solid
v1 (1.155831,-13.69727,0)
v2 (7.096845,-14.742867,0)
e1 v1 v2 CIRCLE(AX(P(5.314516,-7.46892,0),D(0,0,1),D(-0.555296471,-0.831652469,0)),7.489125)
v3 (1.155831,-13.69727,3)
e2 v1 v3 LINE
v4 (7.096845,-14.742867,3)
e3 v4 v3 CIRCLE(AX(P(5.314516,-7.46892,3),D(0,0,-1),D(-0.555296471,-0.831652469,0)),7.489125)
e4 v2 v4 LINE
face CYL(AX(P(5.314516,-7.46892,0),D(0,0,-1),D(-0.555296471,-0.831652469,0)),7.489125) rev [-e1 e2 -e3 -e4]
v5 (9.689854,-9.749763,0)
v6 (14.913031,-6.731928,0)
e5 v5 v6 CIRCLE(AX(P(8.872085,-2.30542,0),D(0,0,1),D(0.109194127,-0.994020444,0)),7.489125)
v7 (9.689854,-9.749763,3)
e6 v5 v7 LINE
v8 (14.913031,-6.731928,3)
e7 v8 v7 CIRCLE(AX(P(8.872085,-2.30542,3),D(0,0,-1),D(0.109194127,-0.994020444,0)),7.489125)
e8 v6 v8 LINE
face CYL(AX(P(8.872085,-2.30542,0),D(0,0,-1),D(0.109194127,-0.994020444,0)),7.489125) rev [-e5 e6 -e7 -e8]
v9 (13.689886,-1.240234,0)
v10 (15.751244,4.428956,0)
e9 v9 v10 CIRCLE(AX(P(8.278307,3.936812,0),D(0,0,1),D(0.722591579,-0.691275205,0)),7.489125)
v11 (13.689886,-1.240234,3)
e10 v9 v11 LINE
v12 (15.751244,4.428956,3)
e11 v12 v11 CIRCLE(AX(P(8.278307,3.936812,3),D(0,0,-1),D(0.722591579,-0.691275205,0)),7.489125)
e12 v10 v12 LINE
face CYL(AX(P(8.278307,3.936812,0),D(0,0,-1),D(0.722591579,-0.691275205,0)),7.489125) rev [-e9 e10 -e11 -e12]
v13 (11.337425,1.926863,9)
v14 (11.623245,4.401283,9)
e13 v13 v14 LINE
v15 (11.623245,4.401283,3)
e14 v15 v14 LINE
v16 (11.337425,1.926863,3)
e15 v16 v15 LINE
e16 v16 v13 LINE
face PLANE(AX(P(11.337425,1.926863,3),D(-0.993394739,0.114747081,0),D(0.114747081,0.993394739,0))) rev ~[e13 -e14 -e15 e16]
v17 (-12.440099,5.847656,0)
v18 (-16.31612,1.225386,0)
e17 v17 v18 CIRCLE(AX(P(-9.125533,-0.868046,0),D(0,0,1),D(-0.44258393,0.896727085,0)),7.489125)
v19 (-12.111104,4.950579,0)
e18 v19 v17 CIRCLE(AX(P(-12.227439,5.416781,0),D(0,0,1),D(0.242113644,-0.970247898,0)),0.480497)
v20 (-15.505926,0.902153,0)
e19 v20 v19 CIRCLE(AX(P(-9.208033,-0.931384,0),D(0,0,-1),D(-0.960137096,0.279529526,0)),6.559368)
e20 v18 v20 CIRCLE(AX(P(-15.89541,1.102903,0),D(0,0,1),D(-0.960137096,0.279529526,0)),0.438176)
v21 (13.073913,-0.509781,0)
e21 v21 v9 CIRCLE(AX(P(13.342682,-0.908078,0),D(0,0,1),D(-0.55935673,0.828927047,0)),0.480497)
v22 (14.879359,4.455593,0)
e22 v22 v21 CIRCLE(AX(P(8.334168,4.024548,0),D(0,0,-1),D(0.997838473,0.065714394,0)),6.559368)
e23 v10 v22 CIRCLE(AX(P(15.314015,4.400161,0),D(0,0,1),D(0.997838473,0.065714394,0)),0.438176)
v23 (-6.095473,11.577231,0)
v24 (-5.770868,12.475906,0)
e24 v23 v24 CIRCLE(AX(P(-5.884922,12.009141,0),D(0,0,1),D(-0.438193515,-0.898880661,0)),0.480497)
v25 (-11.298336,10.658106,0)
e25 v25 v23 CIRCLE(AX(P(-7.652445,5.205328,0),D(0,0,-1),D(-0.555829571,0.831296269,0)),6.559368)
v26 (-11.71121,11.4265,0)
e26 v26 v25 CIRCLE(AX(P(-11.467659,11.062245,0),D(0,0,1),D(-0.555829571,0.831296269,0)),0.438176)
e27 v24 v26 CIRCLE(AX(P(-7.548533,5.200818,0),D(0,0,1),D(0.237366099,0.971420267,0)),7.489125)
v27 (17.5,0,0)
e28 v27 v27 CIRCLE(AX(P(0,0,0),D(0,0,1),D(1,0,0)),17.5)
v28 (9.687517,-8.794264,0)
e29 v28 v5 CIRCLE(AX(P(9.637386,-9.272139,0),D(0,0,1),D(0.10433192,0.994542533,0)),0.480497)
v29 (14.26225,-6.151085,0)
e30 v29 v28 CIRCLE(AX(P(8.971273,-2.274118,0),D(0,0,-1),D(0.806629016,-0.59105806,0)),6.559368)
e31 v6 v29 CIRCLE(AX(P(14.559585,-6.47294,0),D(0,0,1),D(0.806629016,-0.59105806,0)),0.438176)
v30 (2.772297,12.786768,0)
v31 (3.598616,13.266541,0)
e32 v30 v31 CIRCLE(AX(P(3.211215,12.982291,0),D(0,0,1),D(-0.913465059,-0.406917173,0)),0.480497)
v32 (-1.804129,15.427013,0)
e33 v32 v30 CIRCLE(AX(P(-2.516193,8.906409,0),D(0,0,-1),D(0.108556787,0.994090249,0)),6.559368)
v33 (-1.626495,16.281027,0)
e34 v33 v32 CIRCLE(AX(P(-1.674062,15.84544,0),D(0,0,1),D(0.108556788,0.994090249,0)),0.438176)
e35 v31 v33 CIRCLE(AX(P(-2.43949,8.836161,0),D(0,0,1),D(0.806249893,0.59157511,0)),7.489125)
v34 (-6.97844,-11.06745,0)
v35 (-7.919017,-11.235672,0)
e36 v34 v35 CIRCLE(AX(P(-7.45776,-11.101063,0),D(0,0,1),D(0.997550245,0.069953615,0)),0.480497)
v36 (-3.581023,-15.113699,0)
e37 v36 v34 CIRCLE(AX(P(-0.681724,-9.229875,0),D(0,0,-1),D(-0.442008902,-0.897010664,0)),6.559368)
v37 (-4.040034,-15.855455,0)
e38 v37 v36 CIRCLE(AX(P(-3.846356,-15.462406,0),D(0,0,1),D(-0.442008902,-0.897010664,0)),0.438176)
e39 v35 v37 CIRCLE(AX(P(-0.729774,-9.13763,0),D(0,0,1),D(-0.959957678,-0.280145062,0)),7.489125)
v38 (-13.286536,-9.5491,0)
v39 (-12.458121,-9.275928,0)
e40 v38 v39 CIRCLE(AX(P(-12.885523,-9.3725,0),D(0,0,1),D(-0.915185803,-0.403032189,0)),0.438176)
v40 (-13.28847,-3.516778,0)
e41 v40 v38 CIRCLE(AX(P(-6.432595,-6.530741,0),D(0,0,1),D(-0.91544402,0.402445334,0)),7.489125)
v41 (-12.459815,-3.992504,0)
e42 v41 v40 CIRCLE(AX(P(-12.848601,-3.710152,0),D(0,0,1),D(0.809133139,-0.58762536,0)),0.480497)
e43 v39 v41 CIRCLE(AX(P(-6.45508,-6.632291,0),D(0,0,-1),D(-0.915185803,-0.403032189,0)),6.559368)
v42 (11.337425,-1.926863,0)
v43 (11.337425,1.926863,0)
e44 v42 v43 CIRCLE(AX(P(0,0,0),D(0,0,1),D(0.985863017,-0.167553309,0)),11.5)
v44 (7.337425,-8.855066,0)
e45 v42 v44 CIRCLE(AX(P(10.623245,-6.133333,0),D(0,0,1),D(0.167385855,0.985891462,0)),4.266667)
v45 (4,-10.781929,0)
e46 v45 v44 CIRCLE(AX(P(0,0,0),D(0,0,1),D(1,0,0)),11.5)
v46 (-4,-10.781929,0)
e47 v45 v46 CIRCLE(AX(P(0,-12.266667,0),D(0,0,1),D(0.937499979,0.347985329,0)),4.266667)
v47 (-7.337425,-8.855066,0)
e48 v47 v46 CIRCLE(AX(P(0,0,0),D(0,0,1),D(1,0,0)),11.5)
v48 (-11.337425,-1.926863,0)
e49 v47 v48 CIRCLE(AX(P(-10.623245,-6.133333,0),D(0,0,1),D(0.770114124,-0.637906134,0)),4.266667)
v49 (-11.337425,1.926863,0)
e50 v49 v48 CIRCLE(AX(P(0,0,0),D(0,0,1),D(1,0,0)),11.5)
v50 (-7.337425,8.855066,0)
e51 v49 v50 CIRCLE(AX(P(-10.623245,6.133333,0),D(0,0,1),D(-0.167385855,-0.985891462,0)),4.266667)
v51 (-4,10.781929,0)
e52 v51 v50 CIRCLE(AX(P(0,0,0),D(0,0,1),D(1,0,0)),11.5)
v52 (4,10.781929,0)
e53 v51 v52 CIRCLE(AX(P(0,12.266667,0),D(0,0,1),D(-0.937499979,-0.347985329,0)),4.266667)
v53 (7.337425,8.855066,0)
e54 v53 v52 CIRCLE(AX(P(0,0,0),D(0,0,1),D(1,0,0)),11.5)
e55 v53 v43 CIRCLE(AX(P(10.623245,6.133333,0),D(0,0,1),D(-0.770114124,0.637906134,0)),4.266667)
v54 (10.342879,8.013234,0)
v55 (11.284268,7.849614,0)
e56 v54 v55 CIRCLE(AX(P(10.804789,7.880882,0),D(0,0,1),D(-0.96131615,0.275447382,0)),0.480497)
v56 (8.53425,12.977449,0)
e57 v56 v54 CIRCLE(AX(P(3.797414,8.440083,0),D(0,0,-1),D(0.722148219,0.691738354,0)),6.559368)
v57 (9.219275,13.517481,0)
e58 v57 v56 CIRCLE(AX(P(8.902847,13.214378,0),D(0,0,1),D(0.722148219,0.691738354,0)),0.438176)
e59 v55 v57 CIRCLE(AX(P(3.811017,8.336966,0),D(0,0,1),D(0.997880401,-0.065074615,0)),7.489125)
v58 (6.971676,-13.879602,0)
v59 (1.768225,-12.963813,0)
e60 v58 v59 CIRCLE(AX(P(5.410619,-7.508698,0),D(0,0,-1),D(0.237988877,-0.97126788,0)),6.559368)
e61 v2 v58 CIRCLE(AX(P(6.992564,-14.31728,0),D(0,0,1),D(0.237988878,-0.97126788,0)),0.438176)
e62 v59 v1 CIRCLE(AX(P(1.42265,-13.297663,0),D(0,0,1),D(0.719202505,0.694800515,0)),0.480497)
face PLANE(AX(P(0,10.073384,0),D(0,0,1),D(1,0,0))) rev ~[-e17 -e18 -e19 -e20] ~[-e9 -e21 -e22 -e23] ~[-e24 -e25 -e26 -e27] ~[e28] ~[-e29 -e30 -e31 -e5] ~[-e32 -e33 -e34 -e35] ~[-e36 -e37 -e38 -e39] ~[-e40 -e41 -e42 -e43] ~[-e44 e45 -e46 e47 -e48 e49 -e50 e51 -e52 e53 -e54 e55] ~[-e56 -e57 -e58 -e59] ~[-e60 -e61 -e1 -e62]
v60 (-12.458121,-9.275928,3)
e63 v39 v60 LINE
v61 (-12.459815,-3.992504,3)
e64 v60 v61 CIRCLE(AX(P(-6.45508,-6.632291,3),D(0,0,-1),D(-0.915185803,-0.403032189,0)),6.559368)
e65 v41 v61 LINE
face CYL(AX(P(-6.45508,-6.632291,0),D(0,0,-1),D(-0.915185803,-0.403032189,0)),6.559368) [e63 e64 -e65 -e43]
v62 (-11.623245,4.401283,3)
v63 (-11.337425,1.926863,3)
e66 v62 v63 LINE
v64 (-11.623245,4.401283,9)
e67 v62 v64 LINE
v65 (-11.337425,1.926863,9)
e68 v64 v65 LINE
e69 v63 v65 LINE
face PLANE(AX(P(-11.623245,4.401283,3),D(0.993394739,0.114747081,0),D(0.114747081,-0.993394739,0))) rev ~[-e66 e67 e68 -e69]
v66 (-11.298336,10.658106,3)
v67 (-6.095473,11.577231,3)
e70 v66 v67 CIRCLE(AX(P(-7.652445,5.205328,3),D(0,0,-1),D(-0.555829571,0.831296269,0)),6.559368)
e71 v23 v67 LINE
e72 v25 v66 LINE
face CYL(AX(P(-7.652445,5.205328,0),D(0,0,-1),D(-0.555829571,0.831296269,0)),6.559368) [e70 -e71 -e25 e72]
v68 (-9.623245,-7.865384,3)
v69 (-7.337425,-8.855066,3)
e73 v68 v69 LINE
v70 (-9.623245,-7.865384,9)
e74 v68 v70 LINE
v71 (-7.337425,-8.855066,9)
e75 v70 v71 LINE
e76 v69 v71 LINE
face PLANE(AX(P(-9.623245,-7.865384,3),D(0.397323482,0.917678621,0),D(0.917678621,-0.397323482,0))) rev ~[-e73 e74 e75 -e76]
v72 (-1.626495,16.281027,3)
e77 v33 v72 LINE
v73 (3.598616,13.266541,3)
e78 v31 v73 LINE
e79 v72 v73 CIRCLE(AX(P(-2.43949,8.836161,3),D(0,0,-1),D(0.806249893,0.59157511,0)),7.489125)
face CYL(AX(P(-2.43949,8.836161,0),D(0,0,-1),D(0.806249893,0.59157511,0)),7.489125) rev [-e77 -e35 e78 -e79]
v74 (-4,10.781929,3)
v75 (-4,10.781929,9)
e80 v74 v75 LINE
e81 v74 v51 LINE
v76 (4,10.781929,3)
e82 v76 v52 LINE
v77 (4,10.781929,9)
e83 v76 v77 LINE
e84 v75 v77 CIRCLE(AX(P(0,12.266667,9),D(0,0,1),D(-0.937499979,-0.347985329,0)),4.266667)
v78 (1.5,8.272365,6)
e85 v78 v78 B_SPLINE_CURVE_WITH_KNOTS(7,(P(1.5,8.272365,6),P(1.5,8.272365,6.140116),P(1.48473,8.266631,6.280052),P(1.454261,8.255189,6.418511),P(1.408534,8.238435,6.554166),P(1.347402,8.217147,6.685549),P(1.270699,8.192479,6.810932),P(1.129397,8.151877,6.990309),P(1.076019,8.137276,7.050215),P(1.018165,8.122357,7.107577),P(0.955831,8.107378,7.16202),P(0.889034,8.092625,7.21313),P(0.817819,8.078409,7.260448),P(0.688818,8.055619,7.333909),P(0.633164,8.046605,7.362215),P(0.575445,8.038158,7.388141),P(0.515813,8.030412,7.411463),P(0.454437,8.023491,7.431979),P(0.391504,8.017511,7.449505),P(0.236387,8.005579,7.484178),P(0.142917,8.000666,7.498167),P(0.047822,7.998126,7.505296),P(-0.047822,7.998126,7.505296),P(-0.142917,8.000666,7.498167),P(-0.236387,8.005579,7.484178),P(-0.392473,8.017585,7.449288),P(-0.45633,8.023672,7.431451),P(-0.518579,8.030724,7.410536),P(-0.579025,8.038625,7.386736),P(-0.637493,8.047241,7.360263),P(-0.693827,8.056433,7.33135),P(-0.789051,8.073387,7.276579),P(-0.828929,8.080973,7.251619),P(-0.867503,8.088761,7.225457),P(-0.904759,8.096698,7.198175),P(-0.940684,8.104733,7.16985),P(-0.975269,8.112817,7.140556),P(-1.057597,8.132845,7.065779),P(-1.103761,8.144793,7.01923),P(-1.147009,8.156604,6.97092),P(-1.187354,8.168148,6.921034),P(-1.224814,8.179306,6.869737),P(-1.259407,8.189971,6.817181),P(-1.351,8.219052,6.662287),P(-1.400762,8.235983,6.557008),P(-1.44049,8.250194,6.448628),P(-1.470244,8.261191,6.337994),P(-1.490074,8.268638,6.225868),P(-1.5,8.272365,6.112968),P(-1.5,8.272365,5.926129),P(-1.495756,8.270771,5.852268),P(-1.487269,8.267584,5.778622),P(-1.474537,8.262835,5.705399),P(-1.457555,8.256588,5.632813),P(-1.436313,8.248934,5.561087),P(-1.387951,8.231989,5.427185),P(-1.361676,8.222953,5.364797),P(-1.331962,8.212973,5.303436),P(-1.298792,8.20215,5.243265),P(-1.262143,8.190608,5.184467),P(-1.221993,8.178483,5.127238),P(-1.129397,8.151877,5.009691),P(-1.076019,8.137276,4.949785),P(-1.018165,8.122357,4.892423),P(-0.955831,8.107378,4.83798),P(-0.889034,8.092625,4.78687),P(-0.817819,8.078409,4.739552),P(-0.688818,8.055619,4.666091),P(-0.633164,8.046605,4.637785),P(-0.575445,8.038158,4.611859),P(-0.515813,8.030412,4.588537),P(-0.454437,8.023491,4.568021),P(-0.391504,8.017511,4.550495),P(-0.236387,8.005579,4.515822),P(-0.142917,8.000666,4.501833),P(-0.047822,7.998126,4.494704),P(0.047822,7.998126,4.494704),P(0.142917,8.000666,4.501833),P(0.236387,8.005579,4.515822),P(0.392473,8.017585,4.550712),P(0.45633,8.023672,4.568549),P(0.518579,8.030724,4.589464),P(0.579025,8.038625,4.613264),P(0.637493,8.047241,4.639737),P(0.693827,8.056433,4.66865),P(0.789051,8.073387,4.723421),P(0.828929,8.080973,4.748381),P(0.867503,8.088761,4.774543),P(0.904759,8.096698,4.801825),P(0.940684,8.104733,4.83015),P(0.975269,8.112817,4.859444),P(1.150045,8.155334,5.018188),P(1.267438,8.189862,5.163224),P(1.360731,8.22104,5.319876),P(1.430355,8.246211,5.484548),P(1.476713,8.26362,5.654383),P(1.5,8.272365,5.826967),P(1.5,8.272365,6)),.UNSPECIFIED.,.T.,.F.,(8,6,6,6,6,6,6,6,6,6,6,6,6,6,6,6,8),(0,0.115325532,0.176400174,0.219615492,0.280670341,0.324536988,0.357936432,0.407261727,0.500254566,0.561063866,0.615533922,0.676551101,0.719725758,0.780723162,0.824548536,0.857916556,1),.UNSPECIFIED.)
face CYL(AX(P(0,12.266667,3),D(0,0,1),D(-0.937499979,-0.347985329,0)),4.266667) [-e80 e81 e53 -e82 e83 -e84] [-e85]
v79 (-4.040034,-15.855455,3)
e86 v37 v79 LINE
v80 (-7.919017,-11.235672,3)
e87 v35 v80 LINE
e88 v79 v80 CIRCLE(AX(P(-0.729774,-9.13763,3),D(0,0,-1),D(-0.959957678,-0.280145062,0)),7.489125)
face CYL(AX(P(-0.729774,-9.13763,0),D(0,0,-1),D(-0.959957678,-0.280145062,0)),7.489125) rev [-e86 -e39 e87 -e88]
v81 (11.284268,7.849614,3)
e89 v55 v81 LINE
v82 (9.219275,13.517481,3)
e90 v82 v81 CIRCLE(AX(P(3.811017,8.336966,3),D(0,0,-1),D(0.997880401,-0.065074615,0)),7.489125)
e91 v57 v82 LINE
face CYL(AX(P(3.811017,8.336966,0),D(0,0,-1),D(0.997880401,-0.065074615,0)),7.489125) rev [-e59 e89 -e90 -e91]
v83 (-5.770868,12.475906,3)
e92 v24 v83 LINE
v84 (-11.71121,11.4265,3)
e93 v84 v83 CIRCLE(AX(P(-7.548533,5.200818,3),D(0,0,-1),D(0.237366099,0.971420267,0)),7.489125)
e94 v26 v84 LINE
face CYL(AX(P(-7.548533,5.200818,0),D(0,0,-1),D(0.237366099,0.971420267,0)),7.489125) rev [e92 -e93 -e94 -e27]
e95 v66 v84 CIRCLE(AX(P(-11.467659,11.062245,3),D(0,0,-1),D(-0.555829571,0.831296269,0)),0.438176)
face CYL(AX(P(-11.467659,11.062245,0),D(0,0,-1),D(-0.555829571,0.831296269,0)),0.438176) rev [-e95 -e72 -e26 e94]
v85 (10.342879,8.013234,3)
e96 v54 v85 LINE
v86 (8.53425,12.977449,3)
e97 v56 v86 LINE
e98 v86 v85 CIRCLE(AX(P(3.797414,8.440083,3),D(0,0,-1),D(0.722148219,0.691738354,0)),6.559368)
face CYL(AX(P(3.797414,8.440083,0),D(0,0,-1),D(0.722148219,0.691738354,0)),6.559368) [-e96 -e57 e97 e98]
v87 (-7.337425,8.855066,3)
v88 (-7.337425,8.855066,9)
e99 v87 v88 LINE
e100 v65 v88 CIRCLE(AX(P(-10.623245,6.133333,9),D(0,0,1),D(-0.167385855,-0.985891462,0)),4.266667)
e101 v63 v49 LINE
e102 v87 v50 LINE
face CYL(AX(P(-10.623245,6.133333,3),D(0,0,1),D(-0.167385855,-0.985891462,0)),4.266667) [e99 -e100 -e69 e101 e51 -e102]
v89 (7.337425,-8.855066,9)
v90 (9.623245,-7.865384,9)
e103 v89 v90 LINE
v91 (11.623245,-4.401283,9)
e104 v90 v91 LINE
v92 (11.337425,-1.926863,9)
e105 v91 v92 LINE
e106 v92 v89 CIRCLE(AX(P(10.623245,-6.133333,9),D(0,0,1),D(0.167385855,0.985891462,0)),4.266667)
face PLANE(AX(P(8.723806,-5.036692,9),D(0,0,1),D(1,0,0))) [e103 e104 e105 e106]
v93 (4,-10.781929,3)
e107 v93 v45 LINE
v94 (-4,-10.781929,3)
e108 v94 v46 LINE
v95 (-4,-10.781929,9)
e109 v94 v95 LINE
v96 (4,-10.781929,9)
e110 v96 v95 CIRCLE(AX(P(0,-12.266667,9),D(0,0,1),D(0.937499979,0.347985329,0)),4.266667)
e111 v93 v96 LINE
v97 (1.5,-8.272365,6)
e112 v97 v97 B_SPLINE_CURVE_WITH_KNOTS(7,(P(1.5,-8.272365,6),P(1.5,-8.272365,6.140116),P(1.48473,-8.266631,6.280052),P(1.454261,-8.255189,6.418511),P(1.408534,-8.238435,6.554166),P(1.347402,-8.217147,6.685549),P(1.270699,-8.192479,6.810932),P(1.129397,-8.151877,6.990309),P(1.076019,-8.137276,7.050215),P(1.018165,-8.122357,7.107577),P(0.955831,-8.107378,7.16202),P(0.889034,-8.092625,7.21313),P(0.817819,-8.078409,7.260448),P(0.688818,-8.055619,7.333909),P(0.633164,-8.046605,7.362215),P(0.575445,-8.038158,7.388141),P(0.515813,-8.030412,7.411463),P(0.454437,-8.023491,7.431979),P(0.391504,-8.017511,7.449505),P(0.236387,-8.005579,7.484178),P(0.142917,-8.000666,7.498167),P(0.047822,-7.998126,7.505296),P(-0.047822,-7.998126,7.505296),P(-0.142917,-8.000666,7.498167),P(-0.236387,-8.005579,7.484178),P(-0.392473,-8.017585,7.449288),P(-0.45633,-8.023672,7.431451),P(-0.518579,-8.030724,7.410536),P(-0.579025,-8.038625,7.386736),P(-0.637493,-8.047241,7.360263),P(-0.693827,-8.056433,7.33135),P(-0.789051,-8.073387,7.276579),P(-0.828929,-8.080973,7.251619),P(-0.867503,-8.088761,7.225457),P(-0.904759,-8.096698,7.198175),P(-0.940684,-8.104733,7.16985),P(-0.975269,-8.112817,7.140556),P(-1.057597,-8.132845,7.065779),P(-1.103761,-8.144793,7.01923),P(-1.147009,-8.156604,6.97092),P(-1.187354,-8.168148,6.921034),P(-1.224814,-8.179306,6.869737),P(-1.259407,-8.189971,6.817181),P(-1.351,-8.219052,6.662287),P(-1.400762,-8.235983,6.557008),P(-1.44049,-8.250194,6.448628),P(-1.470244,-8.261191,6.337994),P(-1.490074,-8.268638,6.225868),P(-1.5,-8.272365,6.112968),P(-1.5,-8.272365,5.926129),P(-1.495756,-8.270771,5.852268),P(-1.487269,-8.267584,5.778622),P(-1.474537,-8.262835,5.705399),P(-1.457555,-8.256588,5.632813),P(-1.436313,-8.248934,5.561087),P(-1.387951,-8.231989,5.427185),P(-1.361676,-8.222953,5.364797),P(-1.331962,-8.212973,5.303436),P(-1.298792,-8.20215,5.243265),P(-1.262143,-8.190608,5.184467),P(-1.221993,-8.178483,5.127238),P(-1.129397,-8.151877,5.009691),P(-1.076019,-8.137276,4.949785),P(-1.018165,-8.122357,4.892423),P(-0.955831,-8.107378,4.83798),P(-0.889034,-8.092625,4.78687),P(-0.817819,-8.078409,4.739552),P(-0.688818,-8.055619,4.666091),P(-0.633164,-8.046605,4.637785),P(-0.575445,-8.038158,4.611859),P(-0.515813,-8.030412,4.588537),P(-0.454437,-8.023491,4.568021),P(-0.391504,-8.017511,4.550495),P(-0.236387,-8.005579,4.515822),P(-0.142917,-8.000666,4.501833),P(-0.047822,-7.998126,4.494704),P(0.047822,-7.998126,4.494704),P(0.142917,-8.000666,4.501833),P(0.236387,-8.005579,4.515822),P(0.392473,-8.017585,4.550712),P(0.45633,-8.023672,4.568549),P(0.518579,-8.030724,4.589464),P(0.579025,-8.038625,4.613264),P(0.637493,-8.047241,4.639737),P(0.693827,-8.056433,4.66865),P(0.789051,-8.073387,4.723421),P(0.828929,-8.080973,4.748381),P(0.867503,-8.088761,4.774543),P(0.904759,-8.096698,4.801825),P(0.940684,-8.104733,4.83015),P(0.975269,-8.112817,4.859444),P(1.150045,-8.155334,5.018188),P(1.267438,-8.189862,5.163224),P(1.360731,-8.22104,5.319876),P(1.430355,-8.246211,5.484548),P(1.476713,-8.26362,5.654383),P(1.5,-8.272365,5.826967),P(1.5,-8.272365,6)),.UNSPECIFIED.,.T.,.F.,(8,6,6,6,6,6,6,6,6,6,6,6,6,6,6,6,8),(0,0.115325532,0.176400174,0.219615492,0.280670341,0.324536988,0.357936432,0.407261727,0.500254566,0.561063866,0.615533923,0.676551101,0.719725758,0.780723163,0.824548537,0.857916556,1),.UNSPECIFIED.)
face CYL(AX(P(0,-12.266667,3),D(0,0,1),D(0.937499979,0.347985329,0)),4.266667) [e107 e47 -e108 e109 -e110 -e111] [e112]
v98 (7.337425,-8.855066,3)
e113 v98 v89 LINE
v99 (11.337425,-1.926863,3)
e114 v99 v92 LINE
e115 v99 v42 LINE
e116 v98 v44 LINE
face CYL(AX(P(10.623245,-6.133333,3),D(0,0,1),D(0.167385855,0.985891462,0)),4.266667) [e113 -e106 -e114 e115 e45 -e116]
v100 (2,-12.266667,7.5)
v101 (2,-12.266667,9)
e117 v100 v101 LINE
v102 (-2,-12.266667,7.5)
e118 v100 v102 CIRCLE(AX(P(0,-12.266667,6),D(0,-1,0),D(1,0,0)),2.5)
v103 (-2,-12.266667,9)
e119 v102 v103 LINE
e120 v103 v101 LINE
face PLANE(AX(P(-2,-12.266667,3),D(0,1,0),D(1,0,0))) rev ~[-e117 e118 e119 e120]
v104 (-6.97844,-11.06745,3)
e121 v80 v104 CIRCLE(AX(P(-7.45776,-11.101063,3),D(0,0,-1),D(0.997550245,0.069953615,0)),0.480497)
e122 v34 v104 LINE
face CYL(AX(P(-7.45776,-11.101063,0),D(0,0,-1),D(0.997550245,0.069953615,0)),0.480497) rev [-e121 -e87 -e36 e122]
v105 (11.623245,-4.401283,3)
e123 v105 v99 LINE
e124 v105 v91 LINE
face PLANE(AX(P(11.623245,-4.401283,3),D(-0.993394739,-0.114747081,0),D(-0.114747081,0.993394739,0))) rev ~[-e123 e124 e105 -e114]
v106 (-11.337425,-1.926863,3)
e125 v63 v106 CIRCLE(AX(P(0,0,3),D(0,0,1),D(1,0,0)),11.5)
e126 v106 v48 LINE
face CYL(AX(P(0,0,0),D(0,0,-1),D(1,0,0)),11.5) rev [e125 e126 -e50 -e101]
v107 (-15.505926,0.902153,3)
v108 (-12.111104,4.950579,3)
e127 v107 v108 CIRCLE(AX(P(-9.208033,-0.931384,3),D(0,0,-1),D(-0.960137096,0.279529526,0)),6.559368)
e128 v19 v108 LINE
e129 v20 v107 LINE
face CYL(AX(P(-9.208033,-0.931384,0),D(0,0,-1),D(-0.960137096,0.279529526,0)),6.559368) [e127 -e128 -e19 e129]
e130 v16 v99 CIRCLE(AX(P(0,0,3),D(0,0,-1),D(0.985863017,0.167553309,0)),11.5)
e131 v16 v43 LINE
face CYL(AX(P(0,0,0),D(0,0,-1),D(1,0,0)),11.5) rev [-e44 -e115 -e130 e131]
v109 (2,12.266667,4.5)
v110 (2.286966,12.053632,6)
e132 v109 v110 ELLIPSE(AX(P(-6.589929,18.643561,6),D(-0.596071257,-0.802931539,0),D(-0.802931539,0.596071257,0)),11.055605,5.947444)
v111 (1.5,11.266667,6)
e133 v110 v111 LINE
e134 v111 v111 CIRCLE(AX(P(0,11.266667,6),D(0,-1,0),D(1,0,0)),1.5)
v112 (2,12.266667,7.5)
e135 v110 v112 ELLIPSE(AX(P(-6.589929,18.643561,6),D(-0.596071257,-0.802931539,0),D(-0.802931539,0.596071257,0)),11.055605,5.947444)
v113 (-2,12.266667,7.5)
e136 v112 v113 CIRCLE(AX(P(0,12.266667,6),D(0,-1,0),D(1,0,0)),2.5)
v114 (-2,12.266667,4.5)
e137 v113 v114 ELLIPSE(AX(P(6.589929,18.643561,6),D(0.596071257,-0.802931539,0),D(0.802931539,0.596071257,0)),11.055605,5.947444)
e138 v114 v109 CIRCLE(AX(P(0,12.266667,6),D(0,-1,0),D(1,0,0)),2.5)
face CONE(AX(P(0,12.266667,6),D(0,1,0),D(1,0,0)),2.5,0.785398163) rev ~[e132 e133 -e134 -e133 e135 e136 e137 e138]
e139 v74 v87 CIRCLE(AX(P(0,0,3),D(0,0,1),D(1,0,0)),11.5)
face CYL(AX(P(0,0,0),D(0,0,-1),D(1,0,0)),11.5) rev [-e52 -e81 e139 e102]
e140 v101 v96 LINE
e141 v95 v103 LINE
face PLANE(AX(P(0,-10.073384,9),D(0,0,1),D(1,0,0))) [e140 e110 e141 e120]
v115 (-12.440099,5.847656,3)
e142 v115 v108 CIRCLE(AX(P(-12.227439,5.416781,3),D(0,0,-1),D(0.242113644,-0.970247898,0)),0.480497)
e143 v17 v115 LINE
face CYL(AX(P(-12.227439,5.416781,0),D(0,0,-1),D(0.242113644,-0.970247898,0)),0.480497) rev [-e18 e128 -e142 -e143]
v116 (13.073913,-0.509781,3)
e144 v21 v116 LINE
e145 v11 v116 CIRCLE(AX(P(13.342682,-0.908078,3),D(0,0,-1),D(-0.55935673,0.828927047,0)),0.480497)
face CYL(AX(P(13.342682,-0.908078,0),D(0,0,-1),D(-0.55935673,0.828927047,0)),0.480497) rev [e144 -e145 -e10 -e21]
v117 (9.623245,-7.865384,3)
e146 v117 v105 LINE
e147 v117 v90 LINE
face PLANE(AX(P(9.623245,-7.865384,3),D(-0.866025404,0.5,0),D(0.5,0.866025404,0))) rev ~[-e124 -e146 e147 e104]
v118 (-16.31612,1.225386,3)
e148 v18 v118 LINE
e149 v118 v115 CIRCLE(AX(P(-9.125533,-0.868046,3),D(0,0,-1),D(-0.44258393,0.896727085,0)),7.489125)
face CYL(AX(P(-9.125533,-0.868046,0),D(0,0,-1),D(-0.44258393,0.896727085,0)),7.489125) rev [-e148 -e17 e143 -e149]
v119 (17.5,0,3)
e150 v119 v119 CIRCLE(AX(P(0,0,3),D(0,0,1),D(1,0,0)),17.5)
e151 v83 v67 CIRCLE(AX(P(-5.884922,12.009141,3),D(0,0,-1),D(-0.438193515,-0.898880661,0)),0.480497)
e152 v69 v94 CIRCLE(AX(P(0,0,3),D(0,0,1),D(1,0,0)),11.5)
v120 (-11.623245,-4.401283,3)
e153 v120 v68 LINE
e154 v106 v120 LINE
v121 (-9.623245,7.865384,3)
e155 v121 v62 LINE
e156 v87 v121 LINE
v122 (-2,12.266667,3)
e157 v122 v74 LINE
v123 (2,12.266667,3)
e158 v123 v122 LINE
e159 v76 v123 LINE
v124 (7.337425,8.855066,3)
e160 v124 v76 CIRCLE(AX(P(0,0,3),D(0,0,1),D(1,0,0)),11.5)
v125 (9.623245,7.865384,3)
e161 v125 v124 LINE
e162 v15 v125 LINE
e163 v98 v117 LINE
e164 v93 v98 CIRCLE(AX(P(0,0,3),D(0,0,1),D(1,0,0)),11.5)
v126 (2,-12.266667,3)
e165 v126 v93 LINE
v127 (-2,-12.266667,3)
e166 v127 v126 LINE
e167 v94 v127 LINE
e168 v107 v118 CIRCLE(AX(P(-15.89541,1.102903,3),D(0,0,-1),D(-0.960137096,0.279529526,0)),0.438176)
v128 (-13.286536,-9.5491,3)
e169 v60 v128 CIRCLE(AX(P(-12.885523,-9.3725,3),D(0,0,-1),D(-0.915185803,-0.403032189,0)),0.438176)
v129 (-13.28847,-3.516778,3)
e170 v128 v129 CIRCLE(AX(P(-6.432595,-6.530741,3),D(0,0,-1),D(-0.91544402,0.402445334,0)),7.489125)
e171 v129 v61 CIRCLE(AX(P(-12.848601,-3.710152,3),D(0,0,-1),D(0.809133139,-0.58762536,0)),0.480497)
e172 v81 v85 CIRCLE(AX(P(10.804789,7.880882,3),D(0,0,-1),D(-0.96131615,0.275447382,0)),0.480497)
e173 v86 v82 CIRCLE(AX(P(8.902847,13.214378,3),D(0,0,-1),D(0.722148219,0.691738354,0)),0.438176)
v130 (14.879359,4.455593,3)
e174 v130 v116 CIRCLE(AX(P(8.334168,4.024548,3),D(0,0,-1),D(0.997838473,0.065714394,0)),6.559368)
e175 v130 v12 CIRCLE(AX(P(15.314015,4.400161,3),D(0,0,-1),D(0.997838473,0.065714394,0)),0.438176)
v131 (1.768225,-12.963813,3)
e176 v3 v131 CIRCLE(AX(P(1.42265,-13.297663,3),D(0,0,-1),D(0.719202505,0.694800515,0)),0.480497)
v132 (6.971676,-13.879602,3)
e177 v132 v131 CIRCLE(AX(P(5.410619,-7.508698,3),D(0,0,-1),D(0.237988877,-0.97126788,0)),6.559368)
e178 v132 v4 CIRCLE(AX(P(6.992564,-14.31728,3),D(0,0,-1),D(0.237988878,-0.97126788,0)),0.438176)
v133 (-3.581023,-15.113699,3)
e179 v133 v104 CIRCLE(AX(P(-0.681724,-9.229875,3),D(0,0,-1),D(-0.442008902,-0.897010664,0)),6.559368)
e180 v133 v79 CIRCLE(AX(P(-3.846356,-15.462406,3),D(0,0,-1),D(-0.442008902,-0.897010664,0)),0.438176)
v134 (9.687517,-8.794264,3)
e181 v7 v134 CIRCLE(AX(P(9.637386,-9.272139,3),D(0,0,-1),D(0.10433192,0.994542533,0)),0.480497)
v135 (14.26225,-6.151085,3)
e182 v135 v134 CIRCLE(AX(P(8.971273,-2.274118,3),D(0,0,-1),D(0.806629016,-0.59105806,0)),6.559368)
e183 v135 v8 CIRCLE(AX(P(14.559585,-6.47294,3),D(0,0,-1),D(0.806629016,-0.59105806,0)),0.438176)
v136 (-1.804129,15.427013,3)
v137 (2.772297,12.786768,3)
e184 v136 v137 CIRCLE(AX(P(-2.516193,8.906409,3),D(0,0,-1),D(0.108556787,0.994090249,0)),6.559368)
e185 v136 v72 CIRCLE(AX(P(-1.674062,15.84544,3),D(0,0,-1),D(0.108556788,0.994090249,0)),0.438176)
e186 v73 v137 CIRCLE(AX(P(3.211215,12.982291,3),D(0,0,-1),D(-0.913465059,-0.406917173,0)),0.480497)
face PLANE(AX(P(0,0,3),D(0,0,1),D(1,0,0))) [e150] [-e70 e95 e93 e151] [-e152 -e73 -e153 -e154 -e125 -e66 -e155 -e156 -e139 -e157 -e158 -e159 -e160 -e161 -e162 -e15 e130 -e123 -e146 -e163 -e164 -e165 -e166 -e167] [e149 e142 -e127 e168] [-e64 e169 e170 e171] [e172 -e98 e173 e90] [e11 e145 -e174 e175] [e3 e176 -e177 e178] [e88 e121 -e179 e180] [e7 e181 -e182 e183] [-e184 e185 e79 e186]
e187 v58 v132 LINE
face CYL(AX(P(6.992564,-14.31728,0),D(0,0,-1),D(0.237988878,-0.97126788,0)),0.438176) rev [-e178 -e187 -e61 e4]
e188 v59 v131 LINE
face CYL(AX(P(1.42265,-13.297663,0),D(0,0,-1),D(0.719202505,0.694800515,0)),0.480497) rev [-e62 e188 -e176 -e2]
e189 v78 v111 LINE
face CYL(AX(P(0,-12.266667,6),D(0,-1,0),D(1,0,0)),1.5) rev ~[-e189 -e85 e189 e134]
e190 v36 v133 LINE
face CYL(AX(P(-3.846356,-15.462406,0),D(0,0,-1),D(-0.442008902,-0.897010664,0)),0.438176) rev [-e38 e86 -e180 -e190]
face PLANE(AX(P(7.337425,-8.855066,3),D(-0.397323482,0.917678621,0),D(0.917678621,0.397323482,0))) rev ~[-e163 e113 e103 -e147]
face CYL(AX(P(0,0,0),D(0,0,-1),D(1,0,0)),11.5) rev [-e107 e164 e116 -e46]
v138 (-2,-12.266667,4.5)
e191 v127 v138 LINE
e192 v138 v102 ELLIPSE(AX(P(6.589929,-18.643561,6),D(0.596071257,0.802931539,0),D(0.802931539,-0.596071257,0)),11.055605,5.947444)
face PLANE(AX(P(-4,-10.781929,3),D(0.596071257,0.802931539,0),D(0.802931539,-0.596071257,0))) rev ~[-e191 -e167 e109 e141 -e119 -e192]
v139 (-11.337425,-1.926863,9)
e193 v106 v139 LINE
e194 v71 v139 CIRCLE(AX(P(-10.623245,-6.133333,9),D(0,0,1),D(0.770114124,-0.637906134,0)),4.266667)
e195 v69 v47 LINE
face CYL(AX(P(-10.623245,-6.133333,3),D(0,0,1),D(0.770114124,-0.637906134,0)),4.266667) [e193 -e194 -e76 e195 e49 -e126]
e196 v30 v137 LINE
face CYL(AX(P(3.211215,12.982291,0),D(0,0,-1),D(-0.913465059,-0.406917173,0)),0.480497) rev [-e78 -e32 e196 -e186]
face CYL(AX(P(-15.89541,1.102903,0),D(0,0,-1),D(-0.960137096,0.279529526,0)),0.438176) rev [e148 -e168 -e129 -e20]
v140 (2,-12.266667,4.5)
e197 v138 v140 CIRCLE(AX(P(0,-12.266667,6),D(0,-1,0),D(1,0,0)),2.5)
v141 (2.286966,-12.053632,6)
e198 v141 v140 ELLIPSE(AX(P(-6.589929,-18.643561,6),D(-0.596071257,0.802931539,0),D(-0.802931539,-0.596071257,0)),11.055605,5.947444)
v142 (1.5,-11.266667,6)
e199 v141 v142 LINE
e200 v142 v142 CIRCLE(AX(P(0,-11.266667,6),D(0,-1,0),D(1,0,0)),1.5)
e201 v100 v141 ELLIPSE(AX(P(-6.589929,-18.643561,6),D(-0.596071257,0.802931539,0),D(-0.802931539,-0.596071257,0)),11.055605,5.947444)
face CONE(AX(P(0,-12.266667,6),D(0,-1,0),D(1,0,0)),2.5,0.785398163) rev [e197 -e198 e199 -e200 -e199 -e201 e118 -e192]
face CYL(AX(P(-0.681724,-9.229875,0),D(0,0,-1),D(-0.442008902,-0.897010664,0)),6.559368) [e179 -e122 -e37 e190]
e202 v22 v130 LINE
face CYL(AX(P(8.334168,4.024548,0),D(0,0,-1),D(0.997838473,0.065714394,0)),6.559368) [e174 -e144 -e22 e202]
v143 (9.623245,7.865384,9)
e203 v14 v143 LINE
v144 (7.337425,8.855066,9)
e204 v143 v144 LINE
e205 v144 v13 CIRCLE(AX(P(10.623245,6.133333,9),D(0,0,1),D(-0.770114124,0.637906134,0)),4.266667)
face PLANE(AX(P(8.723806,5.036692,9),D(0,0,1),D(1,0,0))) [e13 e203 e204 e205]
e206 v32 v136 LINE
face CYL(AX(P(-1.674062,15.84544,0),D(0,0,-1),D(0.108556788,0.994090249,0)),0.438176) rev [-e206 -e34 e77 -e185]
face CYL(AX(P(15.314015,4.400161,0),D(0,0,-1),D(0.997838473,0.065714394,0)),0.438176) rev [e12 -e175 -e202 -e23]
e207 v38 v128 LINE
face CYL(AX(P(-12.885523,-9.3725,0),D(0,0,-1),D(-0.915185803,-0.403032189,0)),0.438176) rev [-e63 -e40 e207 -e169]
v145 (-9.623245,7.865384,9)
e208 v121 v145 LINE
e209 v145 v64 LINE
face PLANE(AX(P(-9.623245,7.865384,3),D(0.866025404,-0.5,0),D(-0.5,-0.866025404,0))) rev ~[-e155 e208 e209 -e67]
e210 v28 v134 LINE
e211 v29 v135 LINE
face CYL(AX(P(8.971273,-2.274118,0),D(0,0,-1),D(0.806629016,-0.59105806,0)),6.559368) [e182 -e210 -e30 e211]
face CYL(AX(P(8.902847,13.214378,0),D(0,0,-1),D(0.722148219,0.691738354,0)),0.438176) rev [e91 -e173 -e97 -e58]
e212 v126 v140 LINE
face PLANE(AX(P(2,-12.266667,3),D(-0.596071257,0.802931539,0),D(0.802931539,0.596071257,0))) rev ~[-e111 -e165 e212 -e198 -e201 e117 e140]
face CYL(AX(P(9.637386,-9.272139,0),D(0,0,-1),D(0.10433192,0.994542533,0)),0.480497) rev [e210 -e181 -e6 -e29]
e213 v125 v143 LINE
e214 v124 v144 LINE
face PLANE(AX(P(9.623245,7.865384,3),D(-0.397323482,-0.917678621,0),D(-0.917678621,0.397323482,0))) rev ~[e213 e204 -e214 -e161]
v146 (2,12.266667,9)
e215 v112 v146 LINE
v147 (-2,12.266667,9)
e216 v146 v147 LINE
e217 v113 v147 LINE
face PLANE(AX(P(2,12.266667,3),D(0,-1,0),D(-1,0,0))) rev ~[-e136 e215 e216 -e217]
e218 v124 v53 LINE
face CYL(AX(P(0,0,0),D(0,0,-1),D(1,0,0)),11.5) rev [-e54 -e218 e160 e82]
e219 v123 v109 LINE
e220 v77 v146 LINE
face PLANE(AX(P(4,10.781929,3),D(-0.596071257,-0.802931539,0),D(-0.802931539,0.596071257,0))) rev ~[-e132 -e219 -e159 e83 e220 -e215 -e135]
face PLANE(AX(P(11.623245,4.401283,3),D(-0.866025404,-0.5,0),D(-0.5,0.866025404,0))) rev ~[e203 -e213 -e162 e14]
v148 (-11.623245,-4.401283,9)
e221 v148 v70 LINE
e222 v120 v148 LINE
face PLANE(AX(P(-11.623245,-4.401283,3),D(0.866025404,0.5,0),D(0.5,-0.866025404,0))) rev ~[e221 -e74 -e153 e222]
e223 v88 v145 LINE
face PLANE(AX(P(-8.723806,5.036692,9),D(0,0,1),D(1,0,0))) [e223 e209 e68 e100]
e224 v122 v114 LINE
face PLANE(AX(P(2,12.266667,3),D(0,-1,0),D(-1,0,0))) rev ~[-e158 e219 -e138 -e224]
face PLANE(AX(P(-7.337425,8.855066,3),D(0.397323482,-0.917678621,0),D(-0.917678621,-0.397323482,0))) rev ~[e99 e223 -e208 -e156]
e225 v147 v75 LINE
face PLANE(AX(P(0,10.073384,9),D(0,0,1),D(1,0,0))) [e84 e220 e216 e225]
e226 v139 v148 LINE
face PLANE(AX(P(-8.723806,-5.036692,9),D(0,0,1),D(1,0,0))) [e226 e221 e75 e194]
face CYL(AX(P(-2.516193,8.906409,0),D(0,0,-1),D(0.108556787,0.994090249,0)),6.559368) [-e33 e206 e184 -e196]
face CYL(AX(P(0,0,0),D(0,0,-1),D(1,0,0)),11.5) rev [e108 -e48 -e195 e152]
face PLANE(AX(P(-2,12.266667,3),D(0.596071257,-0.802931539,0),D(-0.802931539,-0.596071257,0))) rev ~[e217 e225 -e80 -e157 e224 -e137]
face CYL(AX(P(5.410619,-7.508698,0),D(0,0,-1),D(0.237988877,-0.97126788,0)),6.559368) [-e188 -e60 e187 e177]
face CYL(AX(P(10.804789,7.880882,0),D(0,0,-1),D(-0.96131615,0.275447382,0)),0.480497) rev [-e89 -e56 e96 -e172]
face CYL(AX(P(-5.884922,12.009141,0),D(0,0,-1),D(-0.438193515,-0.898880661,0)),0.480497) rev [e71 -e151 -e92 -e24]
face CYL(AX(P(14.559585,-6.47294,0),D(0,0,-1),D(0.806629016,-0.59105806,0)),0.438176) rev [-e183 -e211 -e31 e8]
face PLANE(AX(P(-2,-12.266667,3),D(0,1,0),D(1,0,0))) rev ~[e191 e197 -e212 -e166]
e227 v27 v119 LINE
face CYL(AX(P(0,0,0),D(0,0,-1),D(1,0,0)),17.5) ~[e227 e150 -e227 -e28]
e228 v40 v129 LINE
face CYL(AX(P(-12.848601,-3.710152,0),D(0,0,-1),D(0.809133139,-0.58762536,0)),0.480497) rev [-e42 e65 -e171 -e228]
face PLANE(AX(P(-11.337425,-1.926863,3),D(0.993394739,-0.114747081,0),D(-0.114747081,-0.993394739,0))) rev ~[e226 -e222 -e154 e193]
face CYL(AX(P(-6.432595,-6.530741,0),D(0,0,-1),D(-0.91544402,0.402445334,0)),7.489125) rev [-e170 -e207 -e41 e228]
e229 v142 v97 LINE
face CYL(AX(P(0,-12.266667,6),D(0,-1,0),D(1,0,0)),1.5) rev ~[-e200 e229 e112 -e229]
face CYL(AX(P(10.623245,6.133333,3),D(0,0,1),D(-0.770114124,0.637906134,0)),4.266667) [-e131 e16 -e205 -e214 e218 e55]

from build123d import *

# Parameters (mm, degrees)
F0_R          = 17.5
F0_R_2        = 11.5
F1_DEPTH      = 3
F3_DEPTH      = 3.001
F5_DEPTH      = 6
F5_DEPTH_BACK = 3
F6_R          = 1.5
F7_DEPTH      = 29.767666761


# Not quite as in the source:
# - a fillet or chamfer that OpenCascade refuses, or shapes differently, is made with other operations: its cross-section is extruded or revolved along the edge and cut away or added


with BuildPart() as f1:
    # F0 (on Top) → F1 (new body)
    with BuildSketch(Plane.XY):
        Circle(F0_R)
        Circle(F0_R_2, mode=Mode.SUBTRACT)
    extrude(amount=F1_DEPTH)

    # F2 (on Top) → F3 (cut, through all)
    with BuildSketch(Plane.XY):
        with BuildLine():
            ThreePointArc((10.3428791664, 8.0132342217), (10.722508829, 7.4074823165), (11.2842680034, 7.8496142891))
            ThreePointArc((11.2842680034, 7.8496142891), (10.8476709377, 10.9006538274), (9.2192751651, 13.5174813857))
            ThreePointArc((9.2192751651, 13.5174813857), (8.6315737781, 13.5584848298), (8.5342502168, 12.9774492654))
            ThreePointArc((8.5342502168, 12.9774492654), (9.9604845752, 10.6854945477), (10.3428791664, 8.0132342217))
        make_face()
        with BuildLine():
            ThreePointArc((2.7722974401, 12.7867681236), (3.4524804527, 12.5667564861), (3.5986159928, 13.2665410638))
            ThreePointArc((3.5986159928, 13.2665410638), (1.3029928249, 15.3231337636), (-1.6264950391, 16.2810273468))
            ThreePointArc((-1.6264950391, 16.2810273468), (-2.1030569267, 15.9346706376), (-1.8041286384, 15.427013193))
            ThreePointArc((-1.8041286384, 15.427013193), (0.761670361, 14.5880397916), (2.7722974401, 12.7867681236))
        make_face()
        with BuildLine():
            ThreePointArc((-6.0954730691, 11.5772311114), (-5.4330018975, 11.8459056319), (-5.770868435, 12.4759058335))
            ThreePointArc((-5.770868435, 12.4759058335), (-8.8513701119, 12.5757491141), (-11.711210138, 11.426499669))
            ThreePointArc((-11.711210138, 11.426499669), (-11.8536439226, 10.85484696), (-11.298335653, 10.6581061954))
            ThreePointArc((-11.298335653, 10.6581061954), (-8.7935378801, 11.6646790891), (-6.0954730691, 11.5772311114))
        make_face()
        with BuildLine():
            ThreePointArc((-12.1111039857, 4.9505789955), (-11.7763222787, 5.5822238799), (-12.440099386, 5.8476556095))
            ThreePointArc((-12.440099386, 5.8476556095), (-14.8640786012, 3.9440316902), (-16.3161198577, 1.2253858046))
            ThreePointArc((-16.3161198577, 1.2253858046), (-16.0577791885, 0.6959197515), (-15.5059258486, 0.9021528573))
            ThreePointArc((-15.5059258486, 0.9021528573), (-14.2341520178, 3.2832854023), (-12.1111039857, 4.9505789955))
        make_face()
        with BuildLine():
            ThreePointArc((-12.4598147474, -3.9925040519), (-12.6093705865, -3.293442465), (-13.288469578, -3.5167776637))
            ThreePointArc((-13.288469578, -3.5167776637), (-13.9217195173, -6.5331419945), (-13.2865357625, -9.5490996964))
            ThreePointArc((-13.2865357625, -9.5490996964), (-12.7483011098, -9.7886360429), (-12.4581210104, -9.275927829))
            ThreePointArc((-12.4581210104, -9.275927829), (-13.0144482314, -6.6343940139), (-12.4598147474, -3.9925040519))
        make_face()
        with BuildLine():
            ThreePointArc((-6.9784397134, -11.0674500817), (-7.5423542593, -10.6280704779), (-7.9190171696, -11.2356715834))
            ThreePointArc((-7.9190171696, -11.2356715834), (-6.4652331485, -13.9533859322), (-4.0400339207, -15.855455323))
            ThreePointArc((-4.0400339207, -15.855455323), (-3.4737512602, -15.6929802443), (-3.5810228949, -15.1136987937))
            ThreePointArc((-3.5810228949, -15.1136987937), (-5.705139478, -13.4477667379), (-6.9784397134, -11.0674500817))
        make_face()
        with BuildLine():
            ThreePointArc((1.7682248193, -12.9638132172), (1.0538134497, -12.9897061964), (1.1558313826, -13.6972698986))
            ThreePointArc((1.1558313826, -13.6972698986), (4.0164076635, -14.8446855176), (7.0968446926, -14.7428671903))
            ThreePointArc((7.0968446926, -14.7428671903), (7.4262054104, -14.2544045814), (6.9716756317, -13.8796021227))
            ThreePointArc((6.9716756317, -13.8796021227), (4.2736674427, -13.9687799499), (1.7682248193, -12.9638132172))
        make_face()
        with BuildLine():
            ThreePointArc((9.6875173073, -8.7942640717), (9.1568901338, -9.2733140211), (9.6898535852, -9.7497634001))
            ThreePointArc((9.6898535852, -9.7497634001), (12.6187266924, -8.7899917691), (14.9130308016, -6.7319276504))
            ThreePointArc((14.9130308016, -6.7319276504), (14.8513580365, -6.1460345947), (14.2622496488, -6.151085364))
            ThreePointArc((14.2622496488, -6.151085364), (12.2527778705, -7.9536457777), (9.6875173073, -8.7942640717))
        make_face()
        with BuildLine():
            ThreePointArc((13.0739127825, -0.5097810297), (12.9753561567, -1.2178351539), (13.6898856045, -1.2402342502))
            ThreePointArc((13.6898856045, -1.2402342502), (15.3166032603, 1.3776368181), (15.7512440587, 4.4289556541))
            ThreePointArc((15.7512440587, 4.4289556541), (15.3273951828, 4.8381332844), (14.8793585479, 4.4555925983))
            ThreePointArc((14.8793585479, 4.4555925983), (14.4986773582, 1.7830876488), (13.0739127825, -0.5097810297))
        make_face()
    extrude(amount=F3_DEPTH, mode=Mode.SUBTRACT)

    # F4 (on face) → F5 (join, two sides)
    with BuildSketch(Plane.XY.offset(3)) as f5_sk:
        with BuildLine():
            ThreePointArc((-4, 10.7819293264), (0, 8), (4, 10.7819293264))
            ThreePointArc((4, 10.7819293264), (0, 11.5), (-4, 10.7819293264))
        make_face()
        with BuildLine():
            ThreePointArc((7.3374246985, 8.8550662783), (6.9282032303, 4), (11.3374246985, 1.9268630481))
            ThreePointArc((11.3374246985, 1.9268630481), (9.9592921435, 5.75), (7.3374246985, 8.8550662783))
        make_face()
        with BuildLine():
            ThreePointArc((7.3374246985, -8.8550662783), (9.9592921435, -5.75), (11.3374246985, -1.9268630481))
            ThreePointArc((11.3374246985, -1.9268630481), (6.9282032303, -4), (7.3374246985, -8.8550662783))
        make_face()
        with BuildLine():
            ThreePointArc((-4, -10.7819293264), (0, -11.5), (4, -10.7819293264))
            ThreePointArc((4, -10.7819293264), (0, -8), (-4, -10.7819293264))
        make_face()
        with BuildLine():
            ThreePointArc((-11.3374246985, -1.9268630481), (-9.9592921435, -5.75), (-7.3374246985, -8.8550662783))
            ThreePointArc((-7.3374246985, -8.8550662783), (-6.9282032303, -4), (-11.3374246985, -1.9268630481))
        make_face()
        with BuildLine():
            ThreePointArc((-11.3374246985, 1.9268630481), (-6.9282032303, 4), (-7.3374246985, 8.8550662783))
            ThreePointArc((-7.3374246985, 8.8550662783), (-9.9592921435, 5.75), (-11.3374246985, 1.9268630481))
        make_face()
        with BuildLine():
            ThreePointArc((-4, 10.7819293264), (0, 11.5), (4, 10.7819293264))
            Line((4, 10.7819293264), (2, 12.266666761))
            Line((2, 12.266666761), (0, 12.266666761))
            Line((0, 12.266666761), (-2, 12.266666761))
            Line((-2, 12.266666761), (-4, 10.7819293264))
        make_face()
        with BuildLine():
            ThreePointArc((7.3374246985, 8.8550662783), (9.9592921435, 5.75), (11.3374246985, 1.9268630481))
            Line((11.3374246985, 1.9268630481), (11.6232450348, 4.4012825729))
            Line((11.6232450348, 4.4012825729), (10.6232450348, 6.1333333805))
            Line((10.6232450348, 6.1333333805), (9.6232450348, 7.8653841881))
            Line((9.6232450348, 7.8653841881), (7.3374246985, 8.8550662783))
        make_face()
        with BuildLine():
            Line((11.6232450348, -4.4012825729), (11.3374246985, -1.9268630481))
            ThreePointArc((11.3374246985, -1.9268630481), (9.9592921435, -5.75), (7.3374246985, -8.8550662783))
            Line((7.3374246985, -8.8550662783), (9.6232450348, -7.8653841881))
            Line((9.6232450348, -7.8653841881), (10.6232450348, -6.1333333805))
            Line((10.6232450348, -6.1333333805), (11.6232450348, -4.4012825729))
        make_face()
        with BuildLine():
            Line((2, -12.266666761), (4, -10.7819293264))
            ThreePointArc((4, -10.7819293264), (0, -11.5), (-4, -10.7819293264))
            Line((-4, -10.7819293264), (-2, -12.266666761))
            Line((-2, -12.266666761), (0, -12.266666761))
            Line((0, -12.266666761), (2, -12.266666761))
        make_face()
        with BuildLine():
            Line((-9.6232450348, -7.8653841881), (-7.3374246985, -8.8550662783))
            ThreePointArc((-7.3374246985, -8.8550662783), (-9.9592921435, -5.75), (-11.3374246985, -1.9268630481))
            Line((-11.3374246985, -1.9268630481), (-11.6232450348, -4.4012825729))
            Line((-11.6232450348, -4.4012825729), (-10.6232450348, -6.1333333805))
            Line((-10.6232450348, -6.1333333805), (-9.6232450348, -7.8653841881))
        make_face()
        with BuildLine():
            ThreePointArc((-11.3374246985, 1.9268630481), (-9.9592921435, 5.75), (-7.3374246985, 8.8550662783))
            Line((-7.3374246985, 8.8550662783), (-9.6232450348, 7.8653841881))
            Line((-9.6232450348, 7.8653841881), (-10.6232450348, 6.1333333805))
            Line((-10.6232450348, 6.1333333805), (-11.6232450348, 4.4012825729))
            Line((-11.6232450348, 4.4012825729), (-11.3374246985, 1.9268630481))
        make_face()
    extrude(amount=F5_DEPTH)
    extrude(f5_sk.sketch, amount=-F5_DEPTH_BACK)

    # F6 (on face) → F7 (cut, through all)
    with BuildSketch(Plane.XZ.offset(12.266666761)):
        with Locations((0, 6)):
            Circle(F6_R)
    extrude(amount=-F7_DEPTH, mode=Mode.SUBTRACT)

    # F8: chamfer of 1 on 2 edges, made by hand

    # F8_s1 → F8_t2 (revolve, cut)
    with BuildSketch(Plane.XY.offset(6)):
        Polygon((2.5, -12.266666761), (1.5, -11.266666761), (1.5, -12.266666761), align=None)
    revolve(axis=Axis((0, -12.266666761, 6), (0, -1, 0)), mode=Mode.SUBTRACT)

    # F8_s3 → F8_t4 (revolve, cut)
    with BuildSketch(Plane.XY.offset(6)):
        Polygon((2.5, 12.266666761), (1.5, 11.266666761), (1.5, 12.266666761), align=None)
    revolve(axis=Axis((0, 12.266666761, 6), (0, -1, 0)), mode=Mode.SUBTRACT)


solid = f1.part
